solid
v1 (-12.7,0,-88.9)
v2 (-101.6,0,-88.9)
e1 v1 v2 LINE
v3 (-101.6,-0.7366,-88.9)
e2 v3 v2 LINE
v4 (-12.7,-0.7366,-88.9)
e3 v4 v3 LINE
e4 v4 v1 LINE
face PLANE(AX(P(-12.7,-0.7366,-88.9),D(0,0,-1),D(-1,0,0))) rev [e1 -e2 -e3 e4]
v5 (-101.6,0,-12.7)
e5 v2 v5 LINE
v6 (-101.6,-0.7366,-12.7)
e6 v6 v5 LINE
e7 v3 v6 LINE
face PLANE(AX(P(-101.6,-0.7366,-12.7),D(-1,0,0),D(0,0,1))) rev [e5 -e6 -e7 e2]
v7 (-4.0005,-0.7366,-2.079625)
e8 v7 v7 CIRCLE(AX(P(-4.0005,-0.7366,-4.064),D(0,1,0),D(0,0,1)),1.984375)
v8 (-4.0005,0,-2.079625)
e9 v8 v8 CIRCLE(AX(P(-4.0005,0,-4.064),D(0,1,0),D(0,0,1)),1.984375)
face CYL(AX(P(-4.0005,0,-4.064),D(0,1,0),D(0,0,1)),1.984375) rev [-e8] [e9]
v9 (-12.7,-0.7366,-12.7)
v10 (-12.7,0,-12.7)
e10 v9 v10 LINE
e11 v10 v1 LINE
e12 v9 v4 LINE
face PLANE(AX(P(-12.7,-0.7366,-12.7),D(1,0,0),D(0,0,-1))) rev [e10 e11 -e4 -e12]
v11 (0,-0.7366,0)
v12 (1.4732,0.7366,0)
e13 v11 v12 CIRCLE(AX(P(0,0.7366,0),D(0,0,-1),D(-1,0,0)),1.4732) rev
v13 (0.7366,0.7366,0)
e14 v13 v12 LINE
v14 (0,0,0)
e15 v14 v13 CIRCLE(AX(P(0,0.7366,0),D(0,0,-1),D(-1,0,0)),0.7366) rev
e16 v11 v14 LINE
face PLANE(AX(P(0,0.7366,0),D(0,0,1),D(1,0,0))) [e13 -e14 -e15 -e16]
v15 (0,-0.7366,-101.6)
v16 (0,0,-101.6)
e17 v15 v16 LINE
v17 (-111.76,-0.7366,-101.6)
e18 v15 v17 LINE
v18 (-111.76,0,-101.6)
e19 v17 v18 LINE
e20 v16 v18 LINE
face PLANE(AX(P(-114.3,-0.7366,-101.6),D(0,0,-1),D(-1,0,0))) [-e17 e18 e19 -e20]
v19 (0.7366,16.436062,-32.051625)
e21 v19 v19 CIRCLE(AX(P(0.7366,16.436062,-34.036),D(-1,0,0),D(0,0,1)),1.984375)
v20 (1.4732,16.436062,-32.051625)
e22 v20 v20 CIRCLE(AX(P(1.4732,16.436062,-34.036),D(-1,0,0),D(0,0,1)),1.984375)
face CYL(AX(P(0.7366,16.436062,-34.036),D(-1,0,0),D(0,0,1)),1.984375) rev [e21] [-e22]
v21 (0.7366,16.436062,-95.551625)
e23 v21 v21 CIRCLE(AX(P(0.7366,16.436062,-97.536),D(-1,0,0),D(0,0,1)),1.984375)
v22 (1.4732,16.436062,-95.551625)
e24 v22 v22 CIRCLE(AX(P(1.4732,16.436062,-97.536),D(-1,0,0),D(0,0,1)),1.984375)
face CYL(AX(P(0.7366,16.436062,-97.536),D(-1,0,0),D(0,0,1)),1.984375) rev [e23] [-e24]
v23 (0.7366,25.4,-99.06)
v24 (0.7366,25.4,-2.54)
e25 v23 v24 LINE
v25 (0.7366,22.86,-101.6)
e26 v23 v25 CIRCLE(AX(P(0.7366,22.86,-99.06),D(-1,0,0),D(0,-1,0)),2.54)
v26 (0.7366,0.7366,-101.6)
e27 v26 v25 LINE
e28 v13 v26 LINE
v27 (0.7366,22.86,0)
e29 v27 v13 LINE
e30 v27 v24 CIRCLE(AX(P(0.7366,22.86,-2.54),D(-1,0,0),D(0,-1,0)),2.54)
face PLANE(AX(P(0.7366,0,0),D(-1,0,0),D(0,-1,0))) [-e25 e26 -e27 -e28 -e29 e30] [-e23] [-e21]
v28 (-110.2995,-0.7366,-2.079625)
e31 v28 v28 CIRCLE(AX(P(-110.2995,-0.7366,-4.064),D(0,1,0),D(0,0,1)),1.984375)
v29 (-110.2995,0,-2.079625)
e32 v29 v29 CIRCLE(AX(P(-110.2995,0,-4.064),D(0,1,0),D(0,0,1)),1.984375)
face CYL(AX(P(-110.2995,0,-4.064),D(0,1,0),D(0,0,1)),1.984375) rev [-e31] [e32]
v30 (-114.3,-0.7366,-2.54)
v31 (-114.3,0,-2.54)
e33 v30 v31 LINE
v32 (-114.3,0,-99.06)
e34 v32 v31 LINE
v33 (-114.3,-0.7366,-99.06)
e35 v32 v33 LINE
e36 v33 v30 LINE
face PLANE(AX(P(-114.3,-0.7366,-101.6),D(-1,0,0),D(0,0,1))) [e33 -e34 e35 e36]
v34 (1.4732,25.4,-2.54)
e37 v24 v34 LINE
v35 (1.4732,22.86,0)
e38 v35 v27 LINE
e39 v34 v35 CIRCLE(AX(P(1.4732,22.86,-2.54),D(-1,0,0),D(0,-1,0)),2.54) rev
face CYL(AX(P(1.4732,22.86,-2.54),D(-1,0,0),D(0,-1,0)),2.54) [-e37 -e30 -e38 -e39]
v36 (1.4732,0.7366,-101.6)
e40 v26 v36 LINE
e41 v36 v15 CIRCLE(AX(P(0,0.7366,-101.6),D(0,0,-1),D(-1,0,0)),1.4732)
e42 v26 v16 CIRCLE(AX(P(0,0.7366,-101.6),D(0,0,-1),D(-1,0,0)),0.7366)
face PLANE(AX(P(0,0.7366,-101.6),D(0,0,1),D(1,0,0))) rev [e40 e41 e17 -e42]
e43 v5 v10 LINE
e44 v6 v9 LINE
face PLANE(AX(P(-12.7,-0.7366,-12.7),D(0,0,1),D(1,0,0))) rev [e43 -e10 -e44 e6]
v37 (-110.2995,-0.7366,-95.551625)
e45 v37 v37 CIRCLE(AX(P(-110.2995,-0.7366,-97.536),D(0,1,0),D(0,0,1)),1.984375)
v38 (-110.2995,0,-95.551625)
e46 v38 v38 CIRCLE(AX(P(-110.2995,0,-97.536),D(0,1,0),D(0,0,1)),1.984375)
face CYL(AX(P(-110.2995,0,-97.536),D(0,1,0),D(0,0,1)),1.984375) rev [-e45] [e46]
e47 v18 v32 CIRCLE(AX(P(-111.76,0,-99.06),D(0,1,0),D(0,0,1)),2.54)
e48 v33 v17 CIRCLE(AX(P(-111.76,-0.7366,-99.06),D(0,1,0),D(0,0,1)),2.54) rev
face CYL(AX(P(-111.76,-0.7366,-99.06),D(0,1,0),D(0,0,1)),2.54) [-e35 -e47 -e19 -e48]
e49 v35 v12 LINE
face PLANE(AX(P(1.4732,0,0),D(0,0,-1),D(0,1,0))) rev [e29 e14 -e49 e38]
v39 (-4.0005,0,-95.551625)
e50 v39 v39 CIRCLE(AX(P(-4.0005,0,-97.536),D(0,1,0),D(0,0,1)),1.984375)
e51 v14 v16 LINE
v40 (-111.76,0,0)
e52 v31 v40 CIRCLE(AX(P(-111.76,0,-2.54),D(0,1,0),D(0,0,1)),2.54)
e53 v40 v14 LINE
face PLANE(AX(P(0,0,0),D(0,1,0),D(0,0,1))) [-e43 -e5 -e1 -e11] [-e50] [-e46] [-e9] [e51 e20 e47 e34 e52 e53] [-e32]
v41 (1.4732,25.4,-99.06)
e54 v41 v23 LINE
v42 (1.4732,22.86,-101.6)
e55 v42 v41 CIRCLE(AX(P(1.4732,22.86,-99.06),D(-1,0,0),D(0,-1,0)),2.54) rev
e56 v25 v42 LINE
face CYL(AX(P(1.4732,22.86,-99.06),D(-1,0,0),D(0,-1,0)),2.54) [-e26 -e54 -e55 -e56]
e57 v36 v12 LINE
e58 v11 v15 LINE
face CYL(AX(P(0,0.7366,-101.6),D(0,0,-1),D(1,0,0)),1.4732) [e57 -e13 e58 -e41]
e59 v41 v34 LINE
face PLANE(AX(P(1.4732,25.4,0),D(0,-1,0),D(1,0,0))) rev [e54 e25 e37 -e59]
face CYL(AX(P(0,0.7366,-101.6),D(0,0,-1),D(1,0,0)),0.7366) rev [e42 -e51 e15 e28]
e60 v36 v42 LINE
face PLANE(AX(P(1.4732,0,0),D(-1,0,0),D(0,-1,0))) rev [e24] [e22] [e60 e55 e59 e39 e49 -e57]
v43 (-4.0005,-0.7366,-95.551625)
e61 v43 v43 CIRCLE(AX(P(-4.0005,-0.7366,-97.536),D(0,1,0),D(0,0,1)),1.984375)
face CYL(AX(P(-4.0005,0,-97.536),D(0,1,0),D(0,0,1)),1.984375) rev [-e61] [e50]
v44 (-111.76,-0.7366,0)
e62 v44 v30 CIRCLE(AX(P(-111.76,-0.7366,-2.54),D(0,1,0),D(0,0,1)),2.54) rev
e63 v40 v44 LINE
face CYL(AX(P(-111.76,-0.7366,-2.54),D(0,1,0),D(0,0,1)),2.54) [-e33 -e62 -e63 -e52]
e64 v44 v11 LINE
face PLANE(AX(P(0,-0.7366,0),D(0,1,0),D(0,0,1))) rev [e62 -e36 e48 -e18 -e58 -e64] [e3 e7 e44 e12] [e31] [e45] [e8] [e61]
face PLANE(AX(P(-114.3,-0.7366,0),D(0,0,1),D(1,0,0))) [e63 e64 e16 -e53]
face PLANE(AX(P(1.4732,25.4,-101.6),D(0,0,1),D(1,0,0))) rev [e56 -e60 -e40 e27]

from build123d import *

# Parameters (mm, degrees)
SKETCH1_W                       = 114.3
SKETCH1_H                       = 101.6
BASE_FLANGE2_DEPTH              = 0.7366
EDGE_FLANGE1_DEPTH              = 101.6
F_5_32_0_15625_DIAMETER_HOLE1_D = 3.96875
F_5_32_0_15625_DIAMETER_HOLE2_D = 3.96875
SKETCH13_W                      = 88.9
SKETCH13_H                      = 76.2
CUT_EXTRUDE1_DEPTH              = 156.02325632
BREAK_CORNER1_START             = 0.7366
BREAK_CORNER1_DEPTH             = 0.7366
BREAK_CORNER1_START_2           = -0.7366
BREAK_CORNER1_2_DEPTH           = 0.7366


# Read off the part's stored shape, not the designer's step: Break-Corner1
# Sheet-metal steps are written as plain solids
with BuildPart() as part:
    # Sketch1 → Base-Flange2 (new body)
    with BuildSketch(Plane(origin=(0, 0, 0), x_dir=(1, 0, 0), z_dir=(0, 1, 0))):
        with Locations((-57.15, 50.8)):
            Rectangle(SKETCH1_W, SKETCH1_H)
    extrude(amount=-BASE_FLANGE2_DEPTH)

    # Edge-Flange1 section (across the edge) → Edge-Flange1 (add)
    with BuildSketch(Plane(origin=(0.7366, 0, 0), x_dir=(-1, 0, 0), z_dir=(0, 0, -1))):
        with BuildLine():
            Line((-0.7366, 0.7366), (-0.7366, 25.4))
            Line((-0.7366, 25.4), (0, 25.4))
            Line((0, 25.4), (0, 0.7366))
            ThreePointArc((0, 0.7366), (0.215745145, 0.215745145), (0.7366, 0))
            Line((0.7366, 0), (0.7366, -0.7366))
            ThreePointArc((0.7366, -0.7366), (-0.30510971, -0.30510971), (-0.7366, 0.7366))
        make_face()
    extrude(amount=EDGE_FLANGE1_DEPTH)

    # 5/32 (0.15625) Diameter Hole1 (through all)
    with Locations(Plane(origin=(0, 0, 0), x_dir=(1, 0, 0), z_dir=(0, 1, 0))):
        with Locations((-110.2995, 4.064), (-110.2995, 97.536), (-4.0005, 97.536), (-4.0005, 4.064)):
            Hole(F_5_32_0_15625_DIAMETER_HOLE1_D / 2)

    # 5/32 (0.15625) Diameter Hole2 (through all)
    with Locations(Plane.ZY.offset(-0.7366)):
        with Locations((-34.036, 16.436061869), (-97.536, 16.436061869)):
            Hole(F_5_32_0_15625_DIAMETER_HOLE2_D / 2)

    # Sketch13 → Cut-Extrude1 (cut, through all)
    with BuildSketch(Plane(origin=(0, 0, 0), x_dir=(1, 0, 0), z_dir=(0, 1, 0))):
        with Locations((-57.15, 50.8)):
            Rectangle(SKETCH13_W, SKETCH13_H)
    extrude(amount=-CUT_EXTRUDE1_DEPTH, mode=Mode.SUBTRACT)

    # Break-Corner1 outline → Break-Corner1 (cut)
    with BuildSketch(Plane.YZ.offset(BREAK_CORNER1_START)):
        with BuildLine():
            Line((25.4, 0), (22.86, 0))
            ThreePointArc((22.86, 0), (24.656051224, -0.743948776), (25.4, -2.54))
            Line((25.4, -2.54), (25.4, 0))
        make_face()
        with BuildLine():
            Line((25.4, -101.6), (25.4, -99.06))
            ThreePointArc((25.4, -99.06), (24.656051224, -100.856051224), (22.86, -101.6))
            Line((22.86, -101.6), (25.4, -101.6))
        make_face()
    extrude(amount=BREAK_CORNER1_DEPTH, mode=Mode.SUBTRACT)

    # Break-Corner1 2 outline → Break-Corner1 2 (cut)
    with BuildSketch(Plane(origin=(0, 0, 0), x_dir=(1, 0, 0), z_dir=(0, 1, 0)).offset(BREAK_CORNER1_START_2)):
        with BuildLine():
            Line((-114.3, 101.6), (-114.3, 99.06))
            ThreePointArc((-114.3, 99.06), (-113.556051224, 100.856051224), (-111.76, 101.6))
            Line((-111.76, 101.6), (-114.3, 101.6))
        make_face()
        with BuildLine():
            ThreePointArc((-111.76, 0), (-113.556051224, 0.743948776), (-114.3, 2.54))
            Line((-114.3, 2.54), (-114.3, 0))
            Line((-114.3, 0), (-111.76, 0))
        make_face()
    extrude(amount=BREAK_CORNER1_2_DEPTH, mode=Mode.SUBTRACT)


solid = part.part
